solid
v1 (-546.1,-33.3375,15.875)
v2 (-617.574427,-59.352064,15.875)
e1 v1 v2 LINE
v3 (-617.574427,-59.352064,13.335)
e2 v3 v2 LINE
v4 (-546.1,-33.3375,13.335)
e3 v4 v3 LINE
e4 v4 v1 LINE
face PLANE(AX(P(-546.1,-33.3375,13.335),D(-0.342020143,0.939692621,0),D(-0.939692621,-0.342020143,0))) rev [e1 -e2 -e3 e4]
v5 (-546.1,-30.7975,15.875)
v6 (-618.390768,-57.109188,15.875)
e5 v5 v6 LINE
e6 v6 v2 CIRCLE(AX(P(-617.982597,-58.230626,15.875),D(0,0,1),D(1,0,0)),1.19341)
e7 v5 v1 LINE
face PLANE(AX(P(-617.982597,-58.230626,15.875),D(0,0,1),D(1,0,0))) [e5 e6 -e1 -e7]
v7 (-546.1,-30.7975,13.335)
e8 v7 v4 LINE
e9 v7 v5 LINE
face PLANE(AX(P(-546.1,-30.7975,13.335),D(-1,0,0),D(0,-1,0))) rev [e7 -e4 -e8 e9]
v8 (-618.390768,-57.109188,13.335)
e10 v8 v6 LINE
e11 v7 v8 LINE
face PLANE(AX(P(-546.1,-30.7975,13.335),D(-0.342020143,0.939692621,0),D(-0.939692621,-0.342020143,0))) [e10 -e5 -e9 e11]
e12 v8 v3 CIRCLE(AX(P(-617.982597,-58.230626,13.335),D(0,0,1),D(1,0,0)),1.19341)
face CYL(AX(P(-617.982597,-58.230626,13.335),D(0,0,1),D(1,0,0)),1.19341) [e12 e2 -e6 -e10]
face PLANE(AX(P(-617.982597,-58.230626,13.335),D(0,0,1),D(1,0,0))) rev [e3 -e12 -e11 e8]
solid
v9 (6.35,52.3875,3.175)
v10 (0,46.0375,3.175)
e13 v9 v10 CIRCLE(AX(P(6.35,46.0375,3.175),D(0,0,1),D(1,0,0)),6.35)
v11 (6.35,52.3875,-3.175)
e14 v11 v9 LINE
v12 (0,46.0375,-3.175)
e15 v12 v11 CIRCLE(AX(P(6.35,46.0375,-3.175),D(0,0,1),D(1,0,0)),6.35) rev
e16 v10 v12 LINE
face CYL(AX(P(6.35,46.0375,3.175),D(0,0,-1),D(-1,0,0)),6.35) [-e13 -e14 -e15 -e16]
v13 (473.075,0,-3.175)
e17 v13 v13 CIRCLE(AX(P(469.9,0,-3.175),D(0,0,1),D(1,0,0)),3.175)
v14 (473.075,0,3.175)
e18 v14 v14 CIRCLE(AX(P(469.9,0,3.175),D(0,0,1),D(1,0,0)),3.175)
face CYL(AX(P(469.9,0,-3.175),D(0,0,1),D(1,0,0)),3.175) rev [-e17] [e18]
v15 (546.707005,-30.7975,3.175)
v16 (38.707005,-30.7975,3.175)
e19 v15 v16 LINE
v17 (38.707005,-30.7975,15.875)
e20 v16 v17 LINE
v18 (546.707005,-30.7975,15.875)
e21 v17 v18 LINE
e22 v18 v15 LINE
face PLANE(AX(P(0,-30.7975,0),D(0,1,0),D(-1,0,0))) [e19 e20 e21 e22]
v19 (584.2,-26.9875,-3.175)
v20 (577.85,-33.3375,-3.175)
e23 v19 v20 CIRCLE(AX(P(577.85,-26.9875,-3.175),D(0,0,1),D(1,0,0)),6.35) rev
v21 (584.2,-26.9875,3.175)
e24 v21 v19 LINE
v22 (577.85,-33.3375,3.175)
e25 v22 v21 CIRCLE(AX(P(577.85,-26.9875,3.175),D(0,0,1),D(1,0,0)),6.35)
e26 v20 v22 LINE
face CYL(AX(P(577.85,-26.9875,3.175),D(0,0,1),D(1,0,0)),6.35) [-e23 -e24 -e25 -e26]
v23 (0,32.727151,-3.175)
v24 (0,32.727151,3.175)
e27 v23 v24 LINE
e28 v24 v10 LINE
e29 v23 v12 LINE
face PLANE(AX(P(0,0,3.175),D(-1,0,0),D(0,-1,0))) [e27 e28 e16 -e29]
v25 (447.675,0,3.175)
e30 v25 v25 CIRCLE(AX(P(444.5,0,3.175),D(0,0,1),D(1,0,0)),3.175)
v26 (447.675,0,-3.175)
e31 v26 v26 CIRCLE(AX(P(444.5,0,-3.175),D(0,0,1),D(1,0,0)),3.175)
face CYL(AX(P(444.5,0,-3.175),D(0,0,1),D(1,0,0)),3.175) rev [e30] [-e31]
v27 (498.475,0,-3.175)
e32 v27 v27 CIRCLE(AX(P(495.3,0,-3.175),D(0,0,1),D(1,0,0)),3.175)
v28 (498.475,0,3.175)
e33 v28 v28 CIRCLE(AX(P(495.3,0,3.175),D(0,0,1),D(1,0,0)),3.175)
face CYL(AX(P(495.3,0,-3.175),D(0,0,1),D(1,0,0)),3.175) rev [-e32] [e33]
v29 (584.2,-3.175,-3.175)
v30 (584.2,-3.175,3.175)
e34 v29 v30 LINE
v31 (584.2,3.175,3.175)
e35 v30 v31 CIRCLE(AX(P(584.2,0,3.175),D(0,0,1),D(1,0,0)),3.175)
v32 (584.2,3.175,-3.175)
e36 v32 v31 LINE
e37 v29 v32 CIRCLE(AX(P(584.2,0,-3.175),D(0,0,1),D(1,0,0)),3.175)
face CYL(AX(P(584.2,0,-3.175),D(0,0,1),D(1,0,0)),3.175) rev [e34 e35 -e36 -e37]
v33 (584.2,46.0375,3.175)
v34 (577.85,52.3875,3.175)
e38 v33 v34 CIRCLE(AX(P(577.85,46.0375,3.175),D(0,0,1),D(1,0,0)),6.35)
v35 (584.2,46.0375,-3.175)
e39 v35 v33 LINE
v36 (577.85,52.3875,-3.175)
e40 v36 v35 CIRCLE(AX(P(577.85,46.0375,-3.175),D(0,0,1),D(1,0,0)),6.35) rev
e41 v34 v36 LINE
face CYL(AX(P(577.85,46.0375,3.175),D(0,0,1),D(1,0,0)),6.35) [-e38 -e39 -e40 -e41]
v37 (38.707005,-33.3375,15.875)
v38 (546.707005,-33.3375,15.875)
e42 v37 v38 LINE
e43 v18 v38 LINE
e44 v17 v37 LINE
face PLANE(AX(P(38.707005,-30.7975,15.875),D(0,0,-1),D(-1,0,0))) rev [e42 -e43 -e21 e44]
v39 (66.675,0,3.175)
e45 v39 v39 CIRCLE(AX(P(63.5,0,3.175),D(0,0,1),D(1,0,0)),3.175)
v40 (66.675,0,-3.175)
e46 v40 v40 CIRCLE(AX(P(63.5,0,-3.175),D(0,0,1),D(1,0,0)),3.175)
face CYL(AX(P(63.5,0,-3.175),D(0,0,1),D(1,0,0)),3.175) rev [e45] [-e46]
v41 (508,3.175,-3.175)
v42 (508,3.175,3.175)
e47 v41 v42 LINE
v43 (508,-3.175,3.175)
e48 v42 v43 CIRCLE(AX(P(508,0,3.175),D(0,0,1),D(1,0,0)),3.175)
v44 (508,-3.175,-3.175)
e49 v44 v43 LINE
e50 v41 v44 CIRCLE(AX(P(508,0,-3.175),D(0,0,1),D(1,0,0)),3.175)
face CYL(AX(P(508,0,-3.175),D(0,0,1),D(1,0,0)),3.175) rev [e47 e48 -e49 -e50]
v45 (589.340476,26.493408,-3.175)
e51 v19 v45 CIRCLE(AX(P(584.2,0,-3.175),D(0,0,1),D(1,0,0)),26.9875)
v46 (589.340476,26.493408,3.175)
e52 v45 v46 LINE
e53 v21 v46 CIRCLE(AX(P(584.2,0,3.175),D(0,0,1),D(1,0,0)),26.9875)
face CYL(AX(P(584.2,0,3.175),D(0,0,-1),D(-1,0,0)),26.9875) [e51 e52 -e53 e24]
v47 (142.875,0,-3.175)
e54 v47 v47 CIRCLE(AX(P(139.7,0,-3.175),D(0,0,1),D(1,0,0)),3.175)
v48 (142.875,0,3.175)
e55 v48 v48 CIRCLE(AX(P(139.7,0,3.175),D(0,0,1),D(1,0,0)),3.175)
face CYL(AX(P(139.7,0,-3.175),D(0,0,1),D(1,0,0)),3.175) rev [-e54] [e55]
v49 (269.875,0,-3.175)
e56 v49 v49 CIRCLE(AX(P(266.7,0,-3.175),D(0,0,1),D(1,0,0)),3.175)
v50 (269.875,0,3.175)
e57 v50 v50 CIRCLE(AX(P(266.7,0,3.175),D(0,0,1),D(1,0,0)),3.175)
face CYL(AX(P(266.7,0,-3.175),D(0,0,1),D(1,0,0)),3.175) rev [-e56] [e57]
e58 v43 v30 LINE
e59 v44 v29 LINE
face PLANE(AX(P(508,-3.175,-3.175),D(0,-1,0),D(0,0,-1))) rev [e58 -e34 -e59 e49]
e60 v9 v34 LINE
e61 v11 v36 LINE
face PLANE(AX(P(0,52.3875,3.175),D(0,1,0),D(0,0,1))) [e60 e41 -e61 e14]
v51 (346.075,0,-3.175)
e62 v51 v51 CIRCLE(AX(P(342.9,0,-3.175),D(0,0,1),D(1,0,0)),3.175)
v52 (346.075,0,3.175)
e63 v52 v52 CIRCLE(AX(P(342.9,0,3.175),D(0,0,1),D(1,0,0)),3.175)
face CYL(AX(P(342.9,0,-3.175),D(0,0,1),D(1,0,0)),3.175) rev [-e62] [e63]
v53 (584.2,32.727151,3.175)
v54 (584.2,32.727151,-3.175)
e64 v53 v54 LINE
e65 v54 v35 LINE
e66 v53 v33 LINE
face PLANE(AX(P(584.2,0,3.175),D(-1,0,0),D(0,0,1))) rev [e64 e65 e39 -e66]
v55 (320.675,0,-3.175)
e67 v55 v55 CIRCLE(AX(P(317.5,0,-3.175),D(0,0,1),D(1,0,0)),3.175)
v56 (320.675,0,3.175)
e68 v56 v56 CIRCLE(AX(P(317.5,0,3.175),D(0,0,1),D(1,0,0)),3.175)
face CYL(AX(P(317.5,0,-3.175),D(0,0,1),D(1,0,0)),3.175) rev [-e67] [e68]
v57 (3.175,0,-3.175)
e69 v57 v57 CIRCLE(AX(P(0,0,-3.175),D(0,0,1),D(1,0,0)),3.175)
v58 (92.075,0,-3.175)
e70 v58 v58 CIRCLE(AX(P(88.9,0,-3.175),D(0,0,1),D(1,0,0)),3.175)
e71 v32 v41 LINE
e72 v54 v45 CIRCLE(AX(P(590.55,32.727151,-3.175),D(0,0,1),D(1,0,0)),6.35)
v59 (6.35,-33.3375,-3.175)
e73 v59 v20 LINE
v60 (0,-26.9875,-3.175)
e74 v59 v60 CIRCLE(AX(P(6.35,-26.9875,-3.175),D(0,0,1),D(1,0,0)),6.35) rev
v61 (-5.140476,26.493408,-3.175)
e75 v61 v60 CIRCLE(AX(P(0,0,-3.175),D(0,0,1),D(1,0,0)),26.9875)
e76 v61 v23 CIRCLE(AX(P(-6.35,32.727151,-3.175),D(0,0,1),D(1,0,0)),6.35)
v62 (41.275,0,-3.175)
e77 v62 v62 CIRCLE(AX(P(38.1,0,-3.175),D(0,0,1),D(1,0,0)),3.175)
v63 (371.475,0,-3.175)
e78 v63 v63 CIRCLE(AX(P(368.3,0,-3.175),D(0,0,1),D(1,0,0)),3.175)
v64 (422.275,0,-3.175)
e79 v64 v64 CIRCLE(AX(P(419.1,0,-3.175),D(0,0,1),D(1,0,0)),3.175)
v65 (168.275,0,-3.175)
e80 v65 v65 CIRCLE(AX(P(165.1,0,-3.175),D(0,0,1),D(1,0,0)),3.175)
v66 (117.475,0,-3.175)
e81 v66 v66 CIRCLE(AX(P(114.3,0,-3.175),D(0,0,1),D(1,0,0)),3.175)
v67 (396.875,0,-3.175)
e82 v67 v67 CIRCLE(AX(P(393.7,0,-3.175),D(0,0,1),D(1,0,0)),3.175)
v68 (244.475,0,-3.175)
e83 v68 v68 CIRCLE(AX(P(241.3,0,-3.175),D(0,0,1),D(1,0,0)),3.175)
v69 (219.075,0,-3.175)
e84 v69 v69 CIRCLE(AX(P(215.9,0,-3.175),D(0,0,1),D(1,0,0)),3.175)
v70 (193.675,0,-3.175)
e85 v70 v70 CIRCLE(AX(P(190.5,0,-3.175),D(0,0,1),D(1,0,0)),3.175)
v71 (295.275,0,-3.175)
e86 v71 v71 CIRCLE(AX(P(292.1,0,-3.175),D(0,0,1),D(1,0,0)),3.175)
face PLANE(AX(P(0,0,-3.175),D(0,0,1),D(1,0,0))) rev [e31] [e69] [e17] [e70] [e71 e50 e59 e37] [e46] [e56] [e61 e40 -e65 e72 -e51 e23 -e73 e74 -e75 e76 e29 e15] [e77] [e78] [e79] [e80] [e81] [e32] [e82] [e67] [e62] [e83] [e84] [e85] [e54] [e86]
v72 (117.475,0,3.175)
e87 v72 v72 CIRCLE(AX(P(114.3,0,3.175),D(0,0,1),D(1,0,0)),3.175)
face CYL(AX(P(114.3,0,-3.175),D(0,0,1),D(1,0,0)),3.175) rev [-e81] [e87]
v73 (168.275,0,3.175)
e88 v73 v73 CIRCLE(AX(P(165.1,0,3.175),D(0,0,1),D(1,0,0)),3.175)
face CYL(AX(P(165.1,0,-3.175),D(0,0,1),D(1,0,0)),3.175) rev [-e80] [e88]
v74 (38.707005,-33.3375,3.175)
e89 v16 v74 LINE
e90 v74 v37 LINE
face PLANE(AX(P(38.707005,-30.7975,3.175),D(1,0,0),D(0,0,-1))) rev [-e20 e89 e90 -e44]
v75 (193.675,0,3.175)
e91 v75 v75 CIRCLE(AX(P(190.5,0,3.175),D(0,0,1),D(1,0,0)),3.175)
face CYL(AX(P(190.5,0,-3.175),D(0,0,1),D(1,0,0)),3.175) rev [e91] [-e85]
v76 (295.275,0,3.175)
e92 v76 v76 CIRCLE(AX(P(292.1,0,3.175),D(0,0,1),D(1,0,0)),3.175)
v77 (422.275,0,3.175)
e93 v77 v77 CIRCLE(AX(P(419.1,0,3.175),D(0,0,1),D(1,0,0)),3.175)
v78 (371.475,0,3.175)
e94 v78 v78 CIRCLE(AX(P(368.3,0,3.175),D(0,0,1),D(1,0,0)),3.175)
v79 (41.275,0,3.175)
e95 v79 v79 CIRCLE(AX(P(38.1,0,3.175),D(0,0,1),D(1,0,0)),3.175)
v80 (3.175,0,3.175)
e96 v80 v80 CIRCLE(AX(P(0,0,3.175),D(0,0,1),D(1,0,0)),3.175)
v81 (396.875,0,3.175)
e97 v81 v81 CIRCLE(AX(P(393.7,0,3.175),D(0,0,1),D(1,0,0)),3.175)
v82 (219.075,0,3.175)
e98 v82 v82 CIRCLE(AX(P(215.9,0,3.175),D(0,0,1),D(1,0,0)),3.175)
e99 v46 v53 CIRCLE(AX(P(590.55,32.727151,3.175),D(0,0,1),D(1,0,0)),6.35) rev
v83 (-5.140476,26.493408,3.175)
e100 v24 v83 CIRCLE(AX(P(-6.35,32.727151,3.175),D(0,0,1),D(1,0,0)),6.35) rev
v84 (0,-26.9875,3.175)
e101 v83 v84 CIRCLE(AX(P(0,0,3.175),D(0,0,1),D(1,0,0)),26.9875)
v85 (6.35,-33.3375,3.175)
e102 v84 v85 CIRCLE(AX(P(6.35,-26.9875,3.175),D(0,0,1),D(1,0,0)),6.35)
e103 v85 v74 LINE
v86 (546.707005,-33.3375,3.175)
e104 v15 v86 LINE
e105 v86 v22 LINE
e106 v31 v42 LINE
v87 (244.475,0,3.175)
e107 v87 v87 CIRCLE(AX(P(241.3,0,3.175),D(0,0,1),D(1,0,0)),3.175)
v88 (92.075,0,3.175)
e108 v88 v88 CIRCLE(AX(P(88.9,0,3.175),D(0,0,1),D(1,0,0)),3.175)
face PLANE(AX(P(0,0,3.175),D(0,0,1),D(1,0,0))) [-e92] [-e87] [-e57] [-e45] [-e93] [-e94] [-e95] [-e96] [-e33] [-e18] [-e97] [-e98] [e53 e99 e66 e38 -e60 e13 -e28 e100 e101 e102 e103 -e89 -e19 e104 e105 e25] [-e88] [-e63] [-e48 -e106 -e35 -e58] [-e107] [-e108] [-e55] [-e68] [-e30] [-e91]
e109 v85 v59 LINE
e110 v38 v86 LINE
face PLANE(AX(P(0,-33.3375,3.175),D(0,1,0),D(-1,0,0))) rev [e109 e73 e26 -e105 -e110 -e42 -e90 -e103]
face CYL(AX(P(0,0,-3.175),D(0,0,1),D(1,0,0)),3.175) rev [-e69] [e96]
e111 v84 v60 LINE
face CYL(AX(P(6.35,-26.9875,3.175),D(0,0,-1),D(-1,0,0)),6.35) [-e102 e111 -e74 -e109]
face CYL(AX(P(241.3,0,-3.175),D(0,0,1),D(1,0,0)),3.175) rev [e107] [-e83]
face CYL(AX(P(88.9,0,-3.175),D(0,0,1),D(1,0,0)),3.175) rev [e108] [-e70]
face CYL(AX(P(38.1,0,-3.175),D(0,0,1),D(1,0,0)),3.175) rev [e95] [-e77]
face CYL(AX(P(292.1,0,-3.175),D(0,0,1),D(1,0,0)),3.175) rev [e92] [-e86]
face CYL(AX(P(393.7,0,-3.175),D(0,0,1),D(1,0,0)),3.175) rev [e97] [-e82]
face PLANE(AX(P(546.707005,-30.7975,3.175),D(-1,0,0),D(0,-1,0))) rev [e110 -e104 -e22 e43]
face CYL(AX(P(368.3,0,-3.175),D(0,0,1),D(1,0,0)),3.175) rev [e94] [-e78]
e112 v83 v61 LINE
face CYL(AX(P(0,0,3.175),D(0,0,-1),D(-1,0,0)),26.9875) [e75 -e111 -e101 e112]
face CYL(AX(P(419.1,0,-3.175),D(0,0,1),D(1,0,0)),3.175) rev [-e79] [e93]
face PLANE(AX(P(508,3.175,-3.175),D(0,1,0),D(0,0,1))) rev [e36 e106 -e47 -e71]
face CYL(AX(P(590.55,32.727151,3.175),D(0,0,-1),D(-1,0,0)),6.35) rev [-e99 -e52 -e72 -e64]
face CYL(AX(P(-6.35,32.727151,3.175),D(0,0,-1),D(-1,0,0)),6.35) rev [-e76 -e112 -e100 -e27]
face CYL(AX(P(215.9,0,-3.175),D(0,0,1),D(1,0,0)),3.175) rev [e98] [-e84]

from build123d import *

# Parameters (mm, degrees)
SKETCH1_W           = 584.2
SKETCH1_H           = 25.4
SKETCH1_H_2         = 6.35
BOSS_EXTRUDE1_DEPTH = 3.175
SKETCH2_R           = 3.175
CUT_EXTRUDE1_DEPTH  = 614.461435473
FILLET1_R           = 6.35
SKETCH3_W           = 508
SKETCH3_H           = 12.7
BOSS_EXTRUDE2_DEPTH = 2.54
BOSS_EXTRUDE3_DEPTH = 2.54


with BuildPart() as part:
    # Sketch1 → Boss-Extrude1 (new, symmetric)
    with BuildSketch(Plane.XY):
        with Locations((292.1, 39.6875)):
            Rectangle(SKETCH1_W, SKETCH1_H)
        with BuildLine():
            Line((0, -26.9875), (584.2, -26.9875))
            ThreePointArc((584.2, -26.9875), (611.1875, 0), (584.2, 26.9875))
            Line((584.2, 26.9875), (0, 26.9875))
            ThreePointArc((0, 26.9875), (-26.9875, 0), (0, -26.9875))
        make_face()
        with Locations((292.1, -30.1625)):
            Rectangle(SKETCH1_W, SKETCH1_H_2)
    extrude(amount=BOSS_EXTRUDE1_DEPTH, both=True)

    # Sketch2 → Cut-Extrude1 (cut, through all)
    with BuildSketch(Plane.XY.offset(3.175)):
        Circle(SKETCH2_R)
        with Locations((38.1, 0)):
            Circle(SKETCH2_R)
        with Locations((63.5, 0)):
            Circle(SKETCH2_R)
        with Locations((88.9, 0)):
            Circle(SKETCH2_R)
        with Locations((114.3, 0)):
            Circle(SKETCH2_R)
        with Locations((139.7, 0)):
            Circle(SKETCH2_R)
        with Locations((165.1, 0)):
            Circle(SKETCH2_R)
        with Locations((190.5, 0)):
            Circle(SKETCH2_R)
        with Locations((215.9, 0)):
            Circle(SKETCH2_R)
        with Locations((241.3, 0)):
            Circle(SKETCH2_R)
        with Locations((266.7, 0)):
            Circle(SKETCH2_R)
        with Locations((292.1, 0)):
            Circle(SKETCH2_R)
        with Locations((317.5, 0)):
            Circle(SKETCH2_R)
        with Locations((342.9, 0)):
            Circle(SKETCH2_R)
        with Locations((368.3, 0)):
            Circle(SKETCH2_R)
        with Locations((393.7, 0)):
            Circle(SKETCH2_R)
        with Locations((419.1, 0)):
            Circle(SKETCH2_R)
        with Locations((444.5, 0)):
            Circle(SKETCH2_R)
        with Locations((469.9, 0)):
            Circle(SKETCH2_R)
        with Locations((495.3, 0)):
            Circle(SKETCH2_R)
        with BuildLine():
            Line((508, 3.175), (584.2, 3.175))
            ThreePointArc((584.2, 3.175), (587.375, 0), (584.2, -3.175))
            Line((584.2, -3.175), (508, -3.175))
            ThreePointArc((508, -3.175), (504.825, 0), (508, 3.175))
        make_face()
    extrude(amount=-CUT_EXTRUDE1_DEPTH, mode=Mode.SUBTRACT)

    # Fillet1
    fillet1_edges = [part.edges().sort_by_distance(p)[0] for p in [
        (584.2, 52.3875, 0),
        (584.2, 26.9875, 0),
        (0, 26.9875, 0),
        (0, 52.3875, 0),
        (0, -33.3375, 0),
        (584.2, -33.3375, 0),
    ]]
    fillet(fillet1_edges, radius=FILLET1_R - 0.0001)  # a hair under: the kernel refuses the full size

    # Sketch3 → Boss-Extrude2 (add)
    with BuildSketch(Plane(origin=(0, -33.3375, 0), x_dir=(1, 0, 0), z_dir=(0, 1, 0))):
        with Locations((292.707005311, -9.525)):
            Rectangle(SKETCH3_W, SKETCH3_H)
    extrude(amount=BOSS_EXTRUDE2_DEPTH)


with BuildPart() as body_2:
    # Sketch4 → Boss-Extrude3 (new body)
    with BuildSketch(Plane.XY.offset(15.875)):
        with BuildLine():
            Line((-546.1, -30.7975), (-546.1, -33.3375))
            Line((-546.1, -33.3375), (-617.574427312, -59.352064053))
            ThreePointArc((-617.574427312, -59.352064053), (-619.104035665, -58.638795963), (-618.390767576, -57.10918761))
            Line((-618.390767576, -57.10918761), (-546.1, -30.7975))
        make_face()
    extrude(amount=-BOSS_EXTRUDE3_DEPTH)


solid = Compound([part.part, body_2.part])
